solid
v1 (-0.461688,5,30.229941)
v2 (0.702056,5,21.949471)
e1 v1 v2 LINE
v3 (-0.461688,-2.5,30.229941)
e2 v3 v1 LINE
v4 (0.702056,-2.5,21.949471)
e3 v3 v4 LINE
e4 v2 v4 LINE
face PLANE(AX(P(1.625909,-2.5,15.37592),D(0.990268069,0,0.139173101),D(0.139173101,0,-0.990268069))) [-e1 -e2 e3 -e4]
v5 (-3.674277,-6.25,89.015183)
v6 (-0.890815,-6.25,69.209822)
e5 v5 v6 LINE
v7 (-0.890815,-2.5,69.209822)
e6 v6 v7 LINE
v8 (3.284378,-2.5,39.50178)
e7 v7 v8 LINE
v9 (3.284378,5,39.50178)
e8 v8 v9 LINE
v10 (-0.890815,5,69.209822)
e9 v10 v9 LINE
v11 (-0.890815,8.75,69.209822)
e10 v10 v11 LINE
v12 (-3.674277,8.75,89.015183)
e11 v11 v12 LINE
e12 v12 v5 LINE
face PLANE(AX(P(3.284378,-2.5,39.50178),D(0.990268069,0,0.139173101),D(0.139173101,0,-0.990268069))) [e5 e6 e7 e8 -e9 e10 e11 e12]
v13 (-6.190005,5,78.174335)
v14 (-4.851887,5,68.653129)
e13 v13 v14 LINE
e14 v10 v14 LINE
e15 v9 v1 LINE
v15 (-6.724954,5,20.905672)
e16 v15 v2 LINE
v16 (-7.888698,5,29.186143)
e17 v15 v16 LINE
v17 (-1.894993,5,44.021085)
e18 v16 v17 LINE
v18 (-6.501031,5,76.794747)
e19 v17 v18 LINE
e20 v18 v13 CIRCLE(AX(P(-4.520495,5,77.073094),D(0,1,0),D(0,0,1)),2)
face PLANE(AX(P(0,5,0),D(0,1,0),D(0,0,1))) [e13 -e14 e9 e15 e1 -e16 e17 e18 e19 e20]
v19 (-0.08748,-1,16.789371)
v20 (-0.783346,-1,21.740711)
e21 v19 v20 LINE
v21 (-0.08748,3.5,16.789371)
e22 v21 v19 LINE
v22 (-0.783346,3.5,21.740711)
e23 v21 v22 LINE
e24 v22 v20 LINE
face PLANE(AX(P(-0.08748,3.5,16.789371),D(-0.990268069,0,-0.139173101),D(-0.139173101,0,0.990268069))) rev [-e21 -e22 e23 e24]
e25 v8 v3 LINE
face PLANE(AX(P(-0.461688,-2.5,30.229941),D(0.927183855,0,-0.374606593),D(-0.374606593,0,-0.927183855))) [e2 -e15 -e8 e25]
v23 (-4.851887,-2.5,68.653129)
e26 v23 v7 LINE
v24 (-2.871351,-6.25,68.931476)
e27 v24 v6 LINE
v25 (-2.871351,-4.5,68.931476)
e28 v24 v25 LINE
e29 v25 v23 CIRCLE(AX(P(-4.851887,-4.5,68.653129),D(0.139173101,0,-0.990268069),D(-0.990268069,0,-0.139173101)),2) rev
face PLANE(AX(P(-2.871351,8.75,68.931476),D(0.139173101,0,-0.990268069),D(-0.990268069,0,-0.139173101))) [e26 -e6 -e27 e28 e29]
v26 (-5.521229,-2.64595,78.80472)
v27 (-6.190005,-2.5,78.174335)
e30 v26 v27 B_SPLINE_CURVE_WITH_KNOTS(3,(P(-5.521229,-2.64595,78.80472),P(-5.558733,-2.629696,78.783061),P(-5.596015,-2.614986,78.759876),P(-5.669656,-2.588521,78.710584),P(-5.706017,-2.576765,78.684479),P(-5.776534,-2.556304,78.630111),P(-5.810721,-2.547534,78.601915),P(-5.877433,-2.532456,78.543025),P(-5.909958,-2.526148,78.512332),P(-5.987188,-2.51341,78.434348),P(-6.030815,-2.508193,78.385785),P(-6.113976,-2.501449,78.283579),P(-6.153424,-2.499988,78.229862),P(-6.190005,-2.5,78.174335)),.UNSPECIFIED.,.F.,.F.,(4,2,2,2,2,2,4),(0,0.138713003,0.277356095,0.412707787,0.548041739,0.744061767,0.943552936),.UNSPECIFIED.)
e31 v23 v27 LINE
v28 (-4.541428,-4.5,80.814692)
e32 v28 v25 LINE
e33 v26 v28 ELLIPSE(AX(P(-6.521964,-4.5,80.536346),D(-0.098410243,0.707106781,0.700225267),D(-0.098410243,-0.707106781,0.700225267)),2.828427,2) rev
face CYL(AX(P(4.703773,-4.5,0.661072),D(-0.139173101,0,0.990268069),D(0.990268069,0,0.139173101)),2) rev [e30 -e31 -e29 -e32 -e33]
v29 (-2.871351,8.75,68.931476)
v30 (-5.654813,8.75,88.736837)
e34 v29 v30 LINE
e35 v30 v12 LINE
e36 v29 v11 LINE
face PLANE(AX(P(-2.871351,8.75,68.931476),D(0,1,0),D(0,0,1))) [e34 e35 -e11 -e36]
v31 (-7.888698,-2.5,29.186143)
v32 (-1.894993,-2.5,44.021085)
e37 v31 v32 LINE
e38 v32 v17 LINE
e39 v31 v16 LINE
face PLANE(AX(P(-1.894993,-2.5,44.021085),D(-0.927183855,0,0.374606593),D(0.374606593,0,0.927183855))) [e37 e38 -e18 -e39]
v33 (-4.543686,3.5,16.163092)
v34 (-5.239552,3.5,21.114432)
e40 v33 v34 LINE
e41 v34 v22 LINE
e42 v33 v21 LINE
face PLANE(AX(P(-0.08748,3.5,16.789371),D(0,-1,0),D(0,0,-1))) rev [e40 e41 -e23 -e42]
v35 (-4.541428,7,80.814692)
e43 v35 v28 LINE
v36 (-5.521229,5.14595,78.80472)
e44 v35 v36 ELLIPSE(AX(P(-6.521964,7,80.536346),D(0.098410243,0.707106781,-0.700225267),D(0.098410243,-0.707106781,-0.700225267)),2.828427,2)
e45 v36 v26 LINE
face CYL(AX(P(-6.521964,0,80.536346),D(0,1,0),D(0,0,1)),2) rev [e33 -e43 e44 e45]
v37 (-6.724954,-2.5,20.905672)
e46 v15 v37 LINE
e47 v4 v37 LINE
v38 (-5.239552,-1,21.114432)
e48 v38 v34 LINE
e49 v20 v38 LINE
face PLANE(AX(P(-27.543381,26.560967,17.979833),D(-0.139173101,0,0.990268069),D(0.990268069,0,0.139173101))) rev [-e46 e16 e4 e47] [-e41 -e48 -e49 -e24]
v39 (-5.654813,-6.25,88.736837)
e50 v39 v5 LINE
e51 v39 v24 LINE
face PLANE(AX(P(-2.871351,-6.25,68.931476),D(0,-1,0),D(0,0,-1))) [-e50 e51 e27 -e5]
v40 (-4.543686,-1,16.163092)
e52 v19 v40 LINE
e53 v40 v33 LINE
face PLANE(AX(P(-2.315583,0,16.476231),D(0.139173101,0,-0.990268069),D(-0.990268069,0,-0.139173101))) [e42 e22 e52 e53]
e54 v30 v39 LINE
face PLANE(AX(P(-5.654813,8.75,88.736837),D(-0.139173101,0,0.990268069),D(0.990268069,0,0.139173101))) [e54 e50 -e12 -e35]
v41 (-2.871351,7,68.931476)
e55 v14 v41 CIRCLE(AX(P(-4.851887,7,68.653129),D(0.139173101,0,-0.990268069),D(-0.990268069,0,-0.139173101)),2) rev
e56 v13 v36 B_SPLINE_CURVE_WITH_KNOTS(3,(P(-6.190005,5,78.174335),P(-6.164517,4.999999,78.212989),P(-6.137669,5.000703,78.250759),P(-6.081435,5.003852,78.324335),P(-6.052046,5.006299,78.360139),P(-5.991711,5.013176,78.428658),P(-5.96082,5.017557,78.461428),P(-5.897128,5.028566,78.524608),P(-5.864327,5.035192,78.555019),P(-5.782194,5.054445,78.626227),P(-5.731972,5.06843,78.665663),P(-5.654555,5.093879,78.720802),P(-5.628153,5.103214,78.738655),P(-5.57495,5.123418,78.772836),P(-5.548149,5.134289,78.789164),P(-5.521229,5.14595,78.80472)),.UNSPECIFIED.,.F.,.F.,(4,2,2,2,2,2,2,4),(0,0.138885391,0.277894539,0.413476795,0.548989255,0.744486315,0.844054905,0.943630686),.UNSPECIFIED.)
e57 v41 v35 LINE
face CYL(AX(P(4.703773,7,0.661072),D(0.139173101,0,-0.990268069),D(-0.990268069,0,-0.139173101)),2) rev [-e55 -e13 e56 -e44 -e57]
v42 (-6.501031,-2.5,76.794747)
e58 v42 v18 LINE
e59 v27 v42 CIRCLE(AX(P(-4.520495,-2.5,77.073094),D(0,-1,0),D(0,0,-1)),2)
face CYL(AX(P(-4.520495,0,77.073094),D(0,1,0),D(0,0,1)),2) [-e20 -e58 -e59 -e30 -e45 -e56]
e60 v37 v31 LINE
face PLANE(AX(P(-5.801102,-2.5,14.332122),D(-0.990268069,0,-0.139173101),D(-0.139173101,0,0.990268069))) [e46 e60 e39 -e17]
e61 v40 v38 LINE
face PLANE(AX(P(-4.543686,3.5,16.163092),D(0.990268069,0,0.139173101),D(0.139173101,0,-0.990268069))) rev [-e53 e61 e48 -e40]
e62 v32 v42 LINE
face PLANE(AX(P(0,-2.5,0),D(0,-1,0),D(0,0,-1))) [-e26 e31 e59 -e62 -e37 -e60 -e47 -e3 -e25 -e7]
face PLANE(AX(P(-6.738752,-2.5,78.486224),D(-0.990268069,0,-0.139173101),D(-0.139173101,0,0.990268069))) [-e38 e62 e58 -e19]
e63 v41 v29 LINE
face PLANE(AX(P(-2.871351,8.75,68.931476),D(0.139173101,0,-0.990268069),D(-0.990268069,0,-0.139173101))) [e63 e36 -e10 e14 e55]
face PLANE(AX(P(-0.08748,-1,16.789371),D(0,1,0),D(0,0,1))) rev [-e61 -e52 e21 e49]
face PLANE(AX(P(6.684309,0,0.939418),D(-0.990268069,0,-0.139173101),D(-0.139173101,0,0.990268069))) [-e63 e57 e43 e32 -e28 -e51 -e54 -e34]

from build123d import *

# Parameters (mm, degrees)
ESQUISSE2_R                  = 20
BOSS_EXTRU_1_DEPTH           = 5
BOSS_EXTRU_2_DEPTH           = 5
R_P_TITION_CIRCULAIRE1_COUNT = 24
D_GAGEMENT_M22_D             = 5.1
BOSS_EXTRU_3_DEPTH           = 7.5
ENL_V_MAT_EXTRU_2_DEPTH      = 83.82071633
ENL_V_MAT_EXTRU_2_DEPTH_BACK = 83.82071633
ESQUISSE13_W                 = 57.206213055
ESQUISSE13_H                 = 37.798612504
ESQUISSE14_W                 = 4.5
ESQUISSE14_H                 = 4.5
BOSS_EXTRU_5_DEPTH           = 5
ESQUISSE17_W                 = 20
ESQUISSE17_H                 = 15
BOSS_EXTRU_7_DEPTH           = 2
CONG_1_R                     = 2
CONG_2_R                     = 2


with BuildPart() as part:
    # Esquisse2 → Boss.-Extru.1 (new body)
    with BuildSketch(Plane(origin=(0, 0, 0), x_dir=(1, 0, 0), z_dir=(0, 1, 0))):
        with Locations(Location((0, 0, 0), (0, 0, 270))):
            Circle(ESQUISSE2_R)
    extrude(amount=BOSS_EXTRU_1_DEPTH)

    # Esquisse3 → Boss.-Extru.2 (add)
    with BuildSketch(Plane(origin=(0, 5, 0), x_dir=(1, 0, 0), z_dir=(0, 1, 0))):
        Polygon((-1.625, 19.933875062), (-1.25, 21.933875062), (1.25, 21.933875062), (1.625, 19.933875062), align=None)
    boss_extru_2 = extrude(amount=-BOSS_EXTRU_2_DEPTH)

    # Répétition circulaire1: Boss.-Extru.2 ×24 about axis
    r_p_tition_circulaire1_axis = Axis((0, 0, 0), (0, 1, 0))
    for i in range(1, R_P_TITION_CIRCULAIRE1_COUNT):
        add(boss_extru_2.rotate(r_p_tition_circulaire1_axis, i * 360 / R_P_TITION_CIRCULAIRE1_COUNT))

    # Dégagement M22 (through all)
    with Locations(Plane(origin=(0, 5, 0), x_dir=(1, 0, 0), z_dir=(0, 1, 0))):
        with Locations((0, 0)):
            Hole(D_GAGEMENT_M22_D / 2)

    # Esquisse11 → Boss.-Extru.3 (add)
    with BuildSketch(Plane(origin=(0, 5, 0), x_dir=(1, 0, 0), z_dir=(0, 1, 0))):
        Polygon((-5.801101772, -14.332121903), (1.625908743, -15.37592016), (-0.461687771, -30.229941191), (3.284378163, -39.501779737), (-2.282545875, -79.112502486), (-6.738752185, -78.486223532), (-1.894992792, -44.021084607), (-7.888698287, -29.186142934), align=None)
    extrude(amount=-BOSS_EXTRU_3_DEPTH)

    # Esquisse13 → Enlèv. mat.-Extru.2 (cut, two sides: drawn at the far end of the back side and taken through both)
    with BuildSketch(Plane(origin=(3.713505258, 0, 0.521899129), x_dir=(0.13917310096006574, 0, -0.9902680687415703), z_dir=(0.9902680687415703, 0, 0.13917310096006574)).offset(-ENL_V_MAT_EXTRU_2_DEPTH_BACK)):
        with Locations((6.964953995, 7.661661133)):
            Rectangle(ESQUISSE13_W, ESQUISSE13_H)
    extrude(amount=ENL_V_MAT_EXTRU_2_DEPTH + ENL_V_MAT_EXTRU_2_DEPTH_BACK, mode=Mode.SUBTRACT)

    # Esquisse14 → Boss.-Extru.5 (add)
    with BuildSketch(Plane(origin=(-3.011448787, 0, 21.427571519), x_dir=(-0.9902680687415703, 0, -0.13917310096006574), z_dir=(0.13917310096006574, 0, -0.9902680687415703))):
        with Locations((0, 1.25)):
            Rectangle(ESQUISSE14_W, ESQUISSE14_H)
    extrude(amount=BOSS_EXTRU_5_DEPTH)

    # Esquisse17 → Boss.-Extru.7 (add)
    with BuildSketch(Plane(origin=(8.664845601, 0, 1.217764633), x_dir=(0.13917310096006535, 0, -0.9902680687415704), z_dir=(0.9902680687415704, 0, 0.13917310096006535))):
        with Locations((-78.660254038, 1.25)):
            Rectangle(ESQUISSE17_W, ESQUISSE17_H)
    extrude(amount=-BOSS_EXTRU_7_DEPTH)

    # Congé1
    cong_1_edges = [part.edges().sort_by_distance(p)[0] for p in [
        (-3.567216508, -2.5, 73.882815941),
        (-3.567216508, 5, 73.882815941),
        (-4.263082013, 1.25, 78.834156284),
    ]]
    fillet(cong_1_edges, radius=CONG_1_R)

    # Congé2
    # the kernel refuses this fillet: 2 mm, written as the material it takes off along each edge
    with BuildSketch(Plane(origin=(-6.738752185, 9.270248109, 78.486223532), x_dir=(0.13917310096006505, 0, -0.9902680687415704), z_dir=(0, -1, 0))) as cong_2_piece_1:
        with BuildLine():
            CenterArc((1.708099244, 2), CONG_2_R, 202.024312837, 67.975687163)
            Line((-0.145950378, 1.25), (-0.33135534, 1.175))
            ThreePointArc((-0.33135534, 1.175), (-0.2, 0.5), (-0.2, 0))
            Line((-0.2, 0), (0, -0.2))
            Line((0, -0.2), (1.708099244, -0.2))
            Line((1.708099244, -0.2), (1.708099244, 0))
        make_face()
    extrude(amount=16.040496218, mode=Mode.SUBTRACT)


solid = part.part
